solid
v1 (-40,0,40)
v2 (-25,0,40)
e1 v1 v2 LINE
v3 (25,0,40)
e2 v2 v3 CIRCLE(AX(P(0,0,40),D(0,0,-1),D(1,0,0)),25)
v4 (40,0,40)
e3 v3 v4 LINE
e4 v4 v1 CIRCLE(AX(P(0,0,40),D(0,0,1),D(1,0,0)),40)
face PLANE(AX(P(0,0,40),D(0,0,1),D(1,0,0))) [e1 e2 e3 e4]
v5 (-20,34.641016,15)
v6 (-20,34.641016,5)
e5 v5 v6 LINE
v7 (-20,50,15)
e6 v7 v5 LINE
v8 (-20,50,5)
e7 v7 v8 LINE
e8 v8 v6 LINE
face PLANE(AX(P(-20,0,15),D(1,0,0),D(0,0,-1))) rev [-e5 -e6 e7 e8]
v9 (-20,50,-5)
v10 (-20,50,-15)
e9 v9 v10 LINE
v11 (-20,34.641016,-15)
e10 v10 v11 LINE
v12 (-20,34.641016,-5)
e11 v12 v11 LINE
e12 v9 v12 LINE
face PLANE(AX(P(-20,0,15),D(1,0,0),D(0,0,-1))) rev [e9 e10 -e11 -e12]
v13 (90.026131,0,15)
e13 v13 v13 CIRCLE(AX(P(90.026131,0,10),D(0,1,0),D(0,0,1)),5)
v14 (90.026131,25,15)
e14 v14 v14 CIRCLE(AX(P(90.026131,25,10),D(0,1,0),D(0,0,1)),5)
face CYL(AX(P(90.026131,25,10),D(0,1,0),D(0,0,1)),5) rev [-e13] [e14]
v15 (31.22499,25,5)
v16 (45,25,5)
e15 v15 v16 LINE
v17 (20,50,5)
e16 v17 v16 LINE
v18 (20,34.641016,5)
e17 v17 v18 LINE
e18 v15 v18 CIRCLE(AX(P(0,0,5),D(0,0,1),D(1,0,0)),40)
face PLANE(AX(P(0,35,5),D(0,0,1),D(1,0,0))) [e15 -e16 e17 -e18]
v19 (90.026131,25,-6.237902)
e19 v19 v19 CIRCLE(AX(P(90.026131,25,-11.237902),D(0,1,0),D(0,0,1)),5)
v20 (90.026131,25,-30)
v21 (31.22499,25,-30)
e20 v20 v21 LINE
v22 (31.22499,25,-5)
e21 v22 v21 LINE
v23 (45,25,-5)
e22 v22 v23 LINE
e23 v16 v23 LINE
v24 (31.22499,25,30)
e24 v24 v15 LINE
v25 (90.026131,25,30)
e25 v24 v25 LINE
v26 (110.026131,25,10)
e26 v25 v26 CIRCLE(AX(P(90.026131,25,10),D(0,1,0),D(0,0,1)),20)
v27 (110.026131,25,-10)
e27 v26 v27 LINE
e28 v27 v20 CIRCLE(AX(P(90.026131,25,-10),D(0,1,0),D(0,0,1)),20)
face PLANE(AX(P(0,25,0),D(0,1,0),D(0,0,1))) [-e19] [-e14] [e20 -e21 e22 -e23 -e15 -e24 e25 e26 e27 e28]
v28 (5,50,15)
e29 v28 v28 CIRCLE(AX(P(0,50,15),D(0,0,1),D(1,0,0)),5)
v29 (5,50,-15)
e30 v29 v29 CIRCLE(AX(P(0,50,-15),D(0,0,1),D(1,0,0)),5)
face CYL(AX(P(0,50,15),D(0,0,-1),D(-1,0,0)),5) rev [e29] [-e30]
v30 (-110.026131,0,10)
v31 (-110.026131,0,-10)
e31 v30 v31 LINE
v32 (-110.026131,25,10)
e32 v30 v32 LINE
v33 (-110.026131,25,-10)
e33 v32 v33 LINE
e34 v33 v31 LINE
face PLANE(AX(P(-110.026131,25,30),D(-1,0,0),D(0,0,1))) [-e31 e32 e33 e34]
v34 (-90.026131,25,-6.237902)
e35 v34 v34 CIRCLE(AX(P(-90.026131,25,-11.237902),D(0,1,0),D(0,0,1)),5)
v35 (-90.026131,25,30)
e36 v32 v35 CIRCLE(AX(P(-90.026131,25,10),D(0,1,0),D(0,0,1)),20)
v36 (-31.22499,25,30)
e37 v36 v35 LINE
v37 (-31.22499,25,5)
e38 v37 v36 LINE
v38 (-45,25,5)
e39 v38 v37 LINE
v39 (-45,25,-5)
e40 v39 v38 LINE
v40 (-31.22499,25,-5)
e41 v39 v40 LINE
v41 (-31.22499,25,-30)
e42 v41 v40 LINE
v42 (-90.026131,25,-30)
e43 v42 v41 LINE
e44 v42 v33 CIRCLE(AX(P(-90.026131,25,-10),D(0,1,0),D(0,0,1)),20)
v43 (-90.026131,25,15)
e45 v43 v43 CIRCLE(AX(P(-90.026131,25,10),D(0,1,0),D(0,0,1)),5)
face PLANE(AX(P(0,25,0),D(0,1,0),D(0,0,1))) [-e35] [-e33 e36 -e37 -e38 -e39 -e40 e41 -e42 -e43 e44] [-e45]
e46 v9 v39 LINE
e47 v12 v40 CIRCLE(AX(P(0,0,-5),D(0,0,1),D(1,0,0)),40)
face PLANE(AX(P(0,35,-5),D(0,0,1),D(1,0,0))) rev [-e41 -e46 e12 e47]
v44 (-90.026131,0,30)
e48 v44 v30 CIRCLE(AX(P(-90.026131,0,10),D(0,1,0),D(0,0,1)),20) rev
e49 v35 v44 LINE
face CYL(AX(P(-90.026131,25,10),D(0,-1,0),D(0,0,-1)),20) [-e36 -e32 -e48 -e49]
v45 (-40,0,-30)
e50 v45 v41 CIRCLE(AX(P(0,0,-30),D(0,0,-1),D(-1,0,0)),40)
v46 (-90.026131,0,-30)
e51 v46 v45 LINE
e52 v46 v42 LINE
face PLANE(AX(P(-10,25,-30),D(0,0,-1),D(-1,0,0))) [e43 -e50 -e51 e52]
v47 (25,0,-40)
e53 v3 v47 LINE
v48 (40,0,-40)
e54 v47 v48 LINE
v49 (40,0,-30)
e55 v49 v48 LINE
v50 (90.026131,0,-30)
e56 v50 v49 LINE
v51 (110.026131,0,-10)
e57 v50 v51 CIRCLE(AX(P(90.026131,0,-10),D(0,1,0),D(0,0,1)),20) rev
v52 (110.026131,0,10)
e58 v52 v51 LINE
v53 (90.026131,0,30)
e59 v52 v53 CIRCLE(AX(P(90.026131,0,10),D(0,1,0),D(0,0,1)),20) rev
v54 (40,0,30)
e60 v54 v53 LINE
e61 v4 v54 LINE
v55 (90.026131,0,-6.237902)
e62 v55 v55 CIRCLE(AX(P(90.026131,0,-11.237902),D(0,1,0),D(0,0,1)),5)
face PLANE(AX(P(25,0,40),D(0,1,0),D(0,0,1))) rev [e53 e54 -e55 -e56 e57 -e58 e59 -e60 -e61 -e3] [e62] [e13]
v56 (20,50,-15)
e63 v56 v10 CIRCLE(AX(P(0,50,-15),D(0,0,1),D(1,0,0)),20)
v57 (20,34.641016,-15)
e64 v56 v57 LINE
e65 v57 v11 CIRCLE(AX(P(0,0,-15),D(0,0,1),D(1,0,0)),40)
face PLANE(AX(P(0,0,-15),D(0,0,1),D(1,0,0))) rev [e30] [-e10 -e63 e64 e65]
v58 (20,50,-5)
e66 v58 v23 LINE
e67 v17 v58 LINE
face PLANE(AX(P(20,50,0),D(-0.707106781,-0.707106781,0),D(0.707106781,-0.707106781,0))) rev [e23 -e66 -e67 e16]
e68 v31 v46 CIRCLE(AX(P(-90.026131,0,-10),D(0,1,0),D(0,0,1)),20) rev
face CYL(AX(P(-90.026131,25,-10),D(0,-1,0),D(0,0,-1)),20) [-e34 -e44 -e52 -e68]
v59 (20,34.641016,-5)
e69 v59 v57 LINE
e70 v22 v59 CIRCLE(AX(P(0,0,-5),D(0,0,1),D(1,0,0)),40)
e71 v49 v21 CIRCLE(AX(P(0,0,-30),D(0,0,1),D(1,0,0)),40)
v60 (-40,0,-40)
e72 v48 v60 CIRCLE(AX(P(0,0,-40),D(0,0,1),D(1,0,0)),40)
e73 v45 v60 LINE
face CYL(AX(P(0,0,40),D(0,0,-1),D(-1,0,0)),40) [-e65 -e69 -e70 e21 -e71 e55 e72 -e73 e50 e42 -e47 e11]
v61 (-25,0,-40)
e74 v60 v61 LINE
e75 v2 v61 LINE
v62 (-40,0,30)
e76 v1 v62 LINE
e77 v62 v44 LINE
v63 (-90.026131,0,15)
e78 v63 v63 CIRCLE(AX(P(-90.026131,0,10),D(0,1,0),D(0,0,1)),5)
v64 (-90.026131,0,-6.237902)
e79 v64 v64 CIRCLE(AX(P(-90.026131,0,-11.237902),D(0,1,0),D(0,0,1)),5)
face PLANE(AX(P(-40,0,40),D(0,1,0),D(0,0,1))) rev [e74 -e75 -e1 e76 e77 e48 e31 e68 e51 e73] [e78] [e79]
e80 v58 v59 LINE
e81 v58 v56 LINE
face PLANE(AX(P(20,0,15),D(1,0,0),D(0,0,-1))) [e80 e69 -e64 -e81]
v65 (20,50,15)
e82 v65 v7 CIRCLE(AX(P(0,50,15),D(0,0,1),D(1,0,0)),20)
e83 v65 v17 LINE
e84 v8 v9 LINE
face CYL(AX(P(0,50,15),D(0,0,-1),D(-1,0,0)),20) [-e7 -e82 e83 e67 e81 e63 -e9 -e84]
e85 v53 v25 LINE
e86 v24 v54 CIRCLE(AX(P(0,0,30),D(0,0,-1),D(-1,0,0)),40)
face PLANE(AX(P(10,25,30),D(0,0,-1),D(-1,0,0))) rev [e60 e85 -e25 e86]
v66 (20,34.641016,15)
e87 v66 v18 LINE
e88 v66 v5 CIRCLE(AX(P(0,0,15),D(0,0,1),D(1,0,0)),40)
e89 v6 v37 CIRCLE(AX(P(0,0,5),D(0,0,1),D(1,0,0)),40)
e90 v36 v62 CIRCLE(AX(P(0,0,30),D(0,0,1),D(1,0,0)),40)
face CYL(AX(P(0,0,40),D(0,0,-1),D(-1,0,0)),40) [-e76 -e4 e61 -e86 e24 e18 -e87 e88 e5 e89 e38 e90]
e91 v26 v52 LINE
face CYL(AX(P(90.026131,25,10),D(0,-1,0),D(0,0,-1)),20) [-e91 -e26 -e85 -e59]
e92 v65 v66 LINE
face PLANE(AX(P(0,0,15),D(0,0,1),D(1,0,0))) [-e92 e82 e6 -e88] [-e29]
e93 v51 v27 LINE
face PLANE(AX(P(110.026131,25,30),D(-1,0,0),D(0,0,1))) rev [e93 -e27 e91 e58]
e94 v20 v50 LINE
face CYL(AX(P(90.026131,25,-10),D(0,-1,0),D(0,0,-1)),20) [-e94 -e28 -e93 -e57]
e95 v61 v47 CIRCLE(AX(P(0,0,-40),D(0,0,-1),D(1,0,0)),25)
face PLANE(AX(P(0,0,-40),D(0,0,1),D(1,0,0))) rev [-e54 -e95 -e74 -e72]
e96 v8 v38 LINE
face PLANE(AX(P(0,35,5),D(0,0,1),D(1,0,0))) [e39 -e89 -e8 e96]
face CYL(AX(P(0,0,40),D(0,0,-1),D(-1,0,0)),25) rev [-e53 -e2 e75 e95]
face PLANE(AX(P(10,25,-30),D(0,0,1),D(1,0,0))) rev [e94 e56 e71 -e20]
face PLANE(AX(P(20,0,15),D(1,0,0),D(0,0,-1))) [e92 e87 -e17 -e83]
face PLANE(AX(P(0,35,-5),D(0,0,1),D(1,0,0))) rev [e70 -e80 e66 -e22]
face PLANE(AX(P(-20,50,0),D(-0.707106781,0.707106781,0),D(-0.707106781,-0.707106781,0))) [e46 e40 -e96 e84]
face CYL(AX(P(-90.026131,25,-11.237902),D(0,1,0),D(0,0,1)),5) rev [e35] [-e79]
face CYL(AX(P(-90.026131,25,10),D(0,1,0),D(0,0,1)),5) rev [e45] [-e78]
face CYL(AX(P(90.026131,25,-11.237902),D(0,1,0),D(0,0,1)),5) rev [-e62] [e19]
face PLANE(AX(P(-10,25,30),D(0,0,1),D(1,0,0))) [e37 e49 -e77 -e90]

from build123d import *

# Parameters (mm, degrees)
BOSS_EXTRUDE1_DEPTH        = 40
SKETCH3_W                  = 100.026130685
SKETCH3_H                  = 60
BOSS_EXTRUDE2_DEPTH        = 25
FILLET1_R                  = 20
F_10_0_10_DIAMETER_HOLE1_D = 10
FILLET1_OF_MIRROR1_R       = 20
DELETEFACE1_START          = -30
DELETEFACE1_DEPTH          = 60
SKETCH16_R                 = 5
BOSS_EXTRUDE3_DEPTH        = 15
RIB1_REACH                 = 138.403
SKETCH18_WALL_W            = 310.161126634
SKETCH18_WALL_H            = 10


# Read off the part's stored shape, not the designer's step: DeleteFace1
with BuildPart() as part:
    # Sketch2 → Boss-Extrude1 (new, symmetric)
    with BuildSketch(Plane.XY):
        with BuildLine():
            Line((-40, 0), (-25, 0))
            ThreePointArc((-25, 0), (0, 25), (25, 0))
            Line((25, 0), (40, 0))
            ThreePointArc((40, 0), (0, 40), (-40, 0))
        make_face()
    extrude(amount=BOSS_EXTRUDE1_DEPTH, both=True)

    # Sketch3 → Boss-Extrude2 (add)
    with BuildSketch(Plane.XZ):
        with Locations((-60.013065343, 0)):
            Rectangle(SKETCH3_W, SKETCH3_H)
    boss_extrude2 = extrude(amount=-BOSS_EXTRUDE2_DEPTH)

    # Fillet1
    fillet1_edges = [part.edges().sort_by_distance(p)[0] for p in [
        (-110.026130685, 12.5, 30),
        (-110.026130685, 12.5, -30),
    ]]
    fillet(fillet1_edges, radius=FILLET1_R)

    # Ø10.0 (10) Diameter Hole1 (through all)
    with Locations(Plane(origin=(0, 25, 0), x_dir=(1, 0, 0), z_dir=(0, 1, 0))):
        with Locations((-90.026130685, -10), (-90.026130685, 11.237902365)):
            f_10_0_10_diameter_hole1 = Hole(F_10_0_10_DIAMETER_HOLE1_D / 2)

    # Mirror1: Boss-Extrude2, Ø10.0 (10) Diameter Hole1 across plane
    add(boss_extrude2.mirror(Plane(origin=(0, 0, 0), x_dir=(0, 0, 1), z_dir=(1, 0, 0))))
    add(f_10_0_10_diameter_hole1.mirror(Plane(origin=(0, 0, 0), x_dir=(0, 0, 1), z_dir=(1, 0, 0))), mode=Mode.SUBTRACT)

    # Fillet1 of Mirror1
    fillet1_of_mirror1_edges = [part.edges().sort_by_distance(p)[0] for p in [
        (110.026130685, 12.5, 30),
        (110.026130685, 12.5, -30),
    ]]
    fillet(fillet1_of_mirror1_edges, radius=FILLET1_OF_MIRROR1_R)

    # DeleteFace1 outline → DeleteFace1 (cut)
    with BuildSketch(Plane.XY.offset(DELETEFACE1_START)):
        with BuildLine():
            ThreePointArc((25, 0), (20.916500663, 13.693063938), (10, 22.912878475))
            Line((10, 22.912878475), (10, 0))
            Line((10, 0), (25, 0))
        make_face()
        with BuildLine():
            ThreePointArc((-10, 22.912878475), (-20.916500663, 13.693063938), (-25, 0))
            Line((-25, 0), (-10, 0))
            Line((-10, 0), (-10, 22.912878475))
        make_face()
    extrude(amount=DELETEFACE1_DEPTH, mode=Mode.SUBTRACT)

    # Sketch16 → Boss-Extrude3 (add, symmetric)
    with BuildSketch(Plane.XY):
        with BuildLine():
            ThreePointArc((20, 34.641016151), (0, 40), (-20, 34.641016151))
            Line((-20, 34.641016151), (-20, 50))
            ThreePointArc((-20, 50), (0, 70), (20, 50))
            Line((20, 50), (20, 34.641016151))
        make_face()
        with Locations((0, 50)):
            Circle(SKETCH16_R, mode=Mode.SUBTRACT)
    extrude(amount=BOSS_EXTRUDE3_DEPTH, both=True)

    # Sketch18 wall → Rib1 (add, up to next)
    with BuildSketch(Plane(origin=(-32.5, 37.5, 0), x_dir=(-0.707106781187, -0.707106781187, 0), z_dir=(0.707106781187, -0.707106781187, 0)), mode=Mode.PRIVATE) as rib1_sk1:
        Rectangle(SKETCH18_WALL_W, SKETCH18_WALL_H)
    rib1_tool1 = extrude(rib1_sk1.sketch, amount=RIB1_REACH, mode=Mode.PRIVATE) - part.part
    rib1 = rib1_tool1.solids().sort_by_distance((-32.5, 37.5, 0))[0]
    add(rib1)

    # Mirror2: Rib1 across plane
    add(rib1.mirror(Plane(origin=(0, 0, 0), x_dir=(0, 0, 1), z_dir=(1, 0, 0))))


solid = part.part
